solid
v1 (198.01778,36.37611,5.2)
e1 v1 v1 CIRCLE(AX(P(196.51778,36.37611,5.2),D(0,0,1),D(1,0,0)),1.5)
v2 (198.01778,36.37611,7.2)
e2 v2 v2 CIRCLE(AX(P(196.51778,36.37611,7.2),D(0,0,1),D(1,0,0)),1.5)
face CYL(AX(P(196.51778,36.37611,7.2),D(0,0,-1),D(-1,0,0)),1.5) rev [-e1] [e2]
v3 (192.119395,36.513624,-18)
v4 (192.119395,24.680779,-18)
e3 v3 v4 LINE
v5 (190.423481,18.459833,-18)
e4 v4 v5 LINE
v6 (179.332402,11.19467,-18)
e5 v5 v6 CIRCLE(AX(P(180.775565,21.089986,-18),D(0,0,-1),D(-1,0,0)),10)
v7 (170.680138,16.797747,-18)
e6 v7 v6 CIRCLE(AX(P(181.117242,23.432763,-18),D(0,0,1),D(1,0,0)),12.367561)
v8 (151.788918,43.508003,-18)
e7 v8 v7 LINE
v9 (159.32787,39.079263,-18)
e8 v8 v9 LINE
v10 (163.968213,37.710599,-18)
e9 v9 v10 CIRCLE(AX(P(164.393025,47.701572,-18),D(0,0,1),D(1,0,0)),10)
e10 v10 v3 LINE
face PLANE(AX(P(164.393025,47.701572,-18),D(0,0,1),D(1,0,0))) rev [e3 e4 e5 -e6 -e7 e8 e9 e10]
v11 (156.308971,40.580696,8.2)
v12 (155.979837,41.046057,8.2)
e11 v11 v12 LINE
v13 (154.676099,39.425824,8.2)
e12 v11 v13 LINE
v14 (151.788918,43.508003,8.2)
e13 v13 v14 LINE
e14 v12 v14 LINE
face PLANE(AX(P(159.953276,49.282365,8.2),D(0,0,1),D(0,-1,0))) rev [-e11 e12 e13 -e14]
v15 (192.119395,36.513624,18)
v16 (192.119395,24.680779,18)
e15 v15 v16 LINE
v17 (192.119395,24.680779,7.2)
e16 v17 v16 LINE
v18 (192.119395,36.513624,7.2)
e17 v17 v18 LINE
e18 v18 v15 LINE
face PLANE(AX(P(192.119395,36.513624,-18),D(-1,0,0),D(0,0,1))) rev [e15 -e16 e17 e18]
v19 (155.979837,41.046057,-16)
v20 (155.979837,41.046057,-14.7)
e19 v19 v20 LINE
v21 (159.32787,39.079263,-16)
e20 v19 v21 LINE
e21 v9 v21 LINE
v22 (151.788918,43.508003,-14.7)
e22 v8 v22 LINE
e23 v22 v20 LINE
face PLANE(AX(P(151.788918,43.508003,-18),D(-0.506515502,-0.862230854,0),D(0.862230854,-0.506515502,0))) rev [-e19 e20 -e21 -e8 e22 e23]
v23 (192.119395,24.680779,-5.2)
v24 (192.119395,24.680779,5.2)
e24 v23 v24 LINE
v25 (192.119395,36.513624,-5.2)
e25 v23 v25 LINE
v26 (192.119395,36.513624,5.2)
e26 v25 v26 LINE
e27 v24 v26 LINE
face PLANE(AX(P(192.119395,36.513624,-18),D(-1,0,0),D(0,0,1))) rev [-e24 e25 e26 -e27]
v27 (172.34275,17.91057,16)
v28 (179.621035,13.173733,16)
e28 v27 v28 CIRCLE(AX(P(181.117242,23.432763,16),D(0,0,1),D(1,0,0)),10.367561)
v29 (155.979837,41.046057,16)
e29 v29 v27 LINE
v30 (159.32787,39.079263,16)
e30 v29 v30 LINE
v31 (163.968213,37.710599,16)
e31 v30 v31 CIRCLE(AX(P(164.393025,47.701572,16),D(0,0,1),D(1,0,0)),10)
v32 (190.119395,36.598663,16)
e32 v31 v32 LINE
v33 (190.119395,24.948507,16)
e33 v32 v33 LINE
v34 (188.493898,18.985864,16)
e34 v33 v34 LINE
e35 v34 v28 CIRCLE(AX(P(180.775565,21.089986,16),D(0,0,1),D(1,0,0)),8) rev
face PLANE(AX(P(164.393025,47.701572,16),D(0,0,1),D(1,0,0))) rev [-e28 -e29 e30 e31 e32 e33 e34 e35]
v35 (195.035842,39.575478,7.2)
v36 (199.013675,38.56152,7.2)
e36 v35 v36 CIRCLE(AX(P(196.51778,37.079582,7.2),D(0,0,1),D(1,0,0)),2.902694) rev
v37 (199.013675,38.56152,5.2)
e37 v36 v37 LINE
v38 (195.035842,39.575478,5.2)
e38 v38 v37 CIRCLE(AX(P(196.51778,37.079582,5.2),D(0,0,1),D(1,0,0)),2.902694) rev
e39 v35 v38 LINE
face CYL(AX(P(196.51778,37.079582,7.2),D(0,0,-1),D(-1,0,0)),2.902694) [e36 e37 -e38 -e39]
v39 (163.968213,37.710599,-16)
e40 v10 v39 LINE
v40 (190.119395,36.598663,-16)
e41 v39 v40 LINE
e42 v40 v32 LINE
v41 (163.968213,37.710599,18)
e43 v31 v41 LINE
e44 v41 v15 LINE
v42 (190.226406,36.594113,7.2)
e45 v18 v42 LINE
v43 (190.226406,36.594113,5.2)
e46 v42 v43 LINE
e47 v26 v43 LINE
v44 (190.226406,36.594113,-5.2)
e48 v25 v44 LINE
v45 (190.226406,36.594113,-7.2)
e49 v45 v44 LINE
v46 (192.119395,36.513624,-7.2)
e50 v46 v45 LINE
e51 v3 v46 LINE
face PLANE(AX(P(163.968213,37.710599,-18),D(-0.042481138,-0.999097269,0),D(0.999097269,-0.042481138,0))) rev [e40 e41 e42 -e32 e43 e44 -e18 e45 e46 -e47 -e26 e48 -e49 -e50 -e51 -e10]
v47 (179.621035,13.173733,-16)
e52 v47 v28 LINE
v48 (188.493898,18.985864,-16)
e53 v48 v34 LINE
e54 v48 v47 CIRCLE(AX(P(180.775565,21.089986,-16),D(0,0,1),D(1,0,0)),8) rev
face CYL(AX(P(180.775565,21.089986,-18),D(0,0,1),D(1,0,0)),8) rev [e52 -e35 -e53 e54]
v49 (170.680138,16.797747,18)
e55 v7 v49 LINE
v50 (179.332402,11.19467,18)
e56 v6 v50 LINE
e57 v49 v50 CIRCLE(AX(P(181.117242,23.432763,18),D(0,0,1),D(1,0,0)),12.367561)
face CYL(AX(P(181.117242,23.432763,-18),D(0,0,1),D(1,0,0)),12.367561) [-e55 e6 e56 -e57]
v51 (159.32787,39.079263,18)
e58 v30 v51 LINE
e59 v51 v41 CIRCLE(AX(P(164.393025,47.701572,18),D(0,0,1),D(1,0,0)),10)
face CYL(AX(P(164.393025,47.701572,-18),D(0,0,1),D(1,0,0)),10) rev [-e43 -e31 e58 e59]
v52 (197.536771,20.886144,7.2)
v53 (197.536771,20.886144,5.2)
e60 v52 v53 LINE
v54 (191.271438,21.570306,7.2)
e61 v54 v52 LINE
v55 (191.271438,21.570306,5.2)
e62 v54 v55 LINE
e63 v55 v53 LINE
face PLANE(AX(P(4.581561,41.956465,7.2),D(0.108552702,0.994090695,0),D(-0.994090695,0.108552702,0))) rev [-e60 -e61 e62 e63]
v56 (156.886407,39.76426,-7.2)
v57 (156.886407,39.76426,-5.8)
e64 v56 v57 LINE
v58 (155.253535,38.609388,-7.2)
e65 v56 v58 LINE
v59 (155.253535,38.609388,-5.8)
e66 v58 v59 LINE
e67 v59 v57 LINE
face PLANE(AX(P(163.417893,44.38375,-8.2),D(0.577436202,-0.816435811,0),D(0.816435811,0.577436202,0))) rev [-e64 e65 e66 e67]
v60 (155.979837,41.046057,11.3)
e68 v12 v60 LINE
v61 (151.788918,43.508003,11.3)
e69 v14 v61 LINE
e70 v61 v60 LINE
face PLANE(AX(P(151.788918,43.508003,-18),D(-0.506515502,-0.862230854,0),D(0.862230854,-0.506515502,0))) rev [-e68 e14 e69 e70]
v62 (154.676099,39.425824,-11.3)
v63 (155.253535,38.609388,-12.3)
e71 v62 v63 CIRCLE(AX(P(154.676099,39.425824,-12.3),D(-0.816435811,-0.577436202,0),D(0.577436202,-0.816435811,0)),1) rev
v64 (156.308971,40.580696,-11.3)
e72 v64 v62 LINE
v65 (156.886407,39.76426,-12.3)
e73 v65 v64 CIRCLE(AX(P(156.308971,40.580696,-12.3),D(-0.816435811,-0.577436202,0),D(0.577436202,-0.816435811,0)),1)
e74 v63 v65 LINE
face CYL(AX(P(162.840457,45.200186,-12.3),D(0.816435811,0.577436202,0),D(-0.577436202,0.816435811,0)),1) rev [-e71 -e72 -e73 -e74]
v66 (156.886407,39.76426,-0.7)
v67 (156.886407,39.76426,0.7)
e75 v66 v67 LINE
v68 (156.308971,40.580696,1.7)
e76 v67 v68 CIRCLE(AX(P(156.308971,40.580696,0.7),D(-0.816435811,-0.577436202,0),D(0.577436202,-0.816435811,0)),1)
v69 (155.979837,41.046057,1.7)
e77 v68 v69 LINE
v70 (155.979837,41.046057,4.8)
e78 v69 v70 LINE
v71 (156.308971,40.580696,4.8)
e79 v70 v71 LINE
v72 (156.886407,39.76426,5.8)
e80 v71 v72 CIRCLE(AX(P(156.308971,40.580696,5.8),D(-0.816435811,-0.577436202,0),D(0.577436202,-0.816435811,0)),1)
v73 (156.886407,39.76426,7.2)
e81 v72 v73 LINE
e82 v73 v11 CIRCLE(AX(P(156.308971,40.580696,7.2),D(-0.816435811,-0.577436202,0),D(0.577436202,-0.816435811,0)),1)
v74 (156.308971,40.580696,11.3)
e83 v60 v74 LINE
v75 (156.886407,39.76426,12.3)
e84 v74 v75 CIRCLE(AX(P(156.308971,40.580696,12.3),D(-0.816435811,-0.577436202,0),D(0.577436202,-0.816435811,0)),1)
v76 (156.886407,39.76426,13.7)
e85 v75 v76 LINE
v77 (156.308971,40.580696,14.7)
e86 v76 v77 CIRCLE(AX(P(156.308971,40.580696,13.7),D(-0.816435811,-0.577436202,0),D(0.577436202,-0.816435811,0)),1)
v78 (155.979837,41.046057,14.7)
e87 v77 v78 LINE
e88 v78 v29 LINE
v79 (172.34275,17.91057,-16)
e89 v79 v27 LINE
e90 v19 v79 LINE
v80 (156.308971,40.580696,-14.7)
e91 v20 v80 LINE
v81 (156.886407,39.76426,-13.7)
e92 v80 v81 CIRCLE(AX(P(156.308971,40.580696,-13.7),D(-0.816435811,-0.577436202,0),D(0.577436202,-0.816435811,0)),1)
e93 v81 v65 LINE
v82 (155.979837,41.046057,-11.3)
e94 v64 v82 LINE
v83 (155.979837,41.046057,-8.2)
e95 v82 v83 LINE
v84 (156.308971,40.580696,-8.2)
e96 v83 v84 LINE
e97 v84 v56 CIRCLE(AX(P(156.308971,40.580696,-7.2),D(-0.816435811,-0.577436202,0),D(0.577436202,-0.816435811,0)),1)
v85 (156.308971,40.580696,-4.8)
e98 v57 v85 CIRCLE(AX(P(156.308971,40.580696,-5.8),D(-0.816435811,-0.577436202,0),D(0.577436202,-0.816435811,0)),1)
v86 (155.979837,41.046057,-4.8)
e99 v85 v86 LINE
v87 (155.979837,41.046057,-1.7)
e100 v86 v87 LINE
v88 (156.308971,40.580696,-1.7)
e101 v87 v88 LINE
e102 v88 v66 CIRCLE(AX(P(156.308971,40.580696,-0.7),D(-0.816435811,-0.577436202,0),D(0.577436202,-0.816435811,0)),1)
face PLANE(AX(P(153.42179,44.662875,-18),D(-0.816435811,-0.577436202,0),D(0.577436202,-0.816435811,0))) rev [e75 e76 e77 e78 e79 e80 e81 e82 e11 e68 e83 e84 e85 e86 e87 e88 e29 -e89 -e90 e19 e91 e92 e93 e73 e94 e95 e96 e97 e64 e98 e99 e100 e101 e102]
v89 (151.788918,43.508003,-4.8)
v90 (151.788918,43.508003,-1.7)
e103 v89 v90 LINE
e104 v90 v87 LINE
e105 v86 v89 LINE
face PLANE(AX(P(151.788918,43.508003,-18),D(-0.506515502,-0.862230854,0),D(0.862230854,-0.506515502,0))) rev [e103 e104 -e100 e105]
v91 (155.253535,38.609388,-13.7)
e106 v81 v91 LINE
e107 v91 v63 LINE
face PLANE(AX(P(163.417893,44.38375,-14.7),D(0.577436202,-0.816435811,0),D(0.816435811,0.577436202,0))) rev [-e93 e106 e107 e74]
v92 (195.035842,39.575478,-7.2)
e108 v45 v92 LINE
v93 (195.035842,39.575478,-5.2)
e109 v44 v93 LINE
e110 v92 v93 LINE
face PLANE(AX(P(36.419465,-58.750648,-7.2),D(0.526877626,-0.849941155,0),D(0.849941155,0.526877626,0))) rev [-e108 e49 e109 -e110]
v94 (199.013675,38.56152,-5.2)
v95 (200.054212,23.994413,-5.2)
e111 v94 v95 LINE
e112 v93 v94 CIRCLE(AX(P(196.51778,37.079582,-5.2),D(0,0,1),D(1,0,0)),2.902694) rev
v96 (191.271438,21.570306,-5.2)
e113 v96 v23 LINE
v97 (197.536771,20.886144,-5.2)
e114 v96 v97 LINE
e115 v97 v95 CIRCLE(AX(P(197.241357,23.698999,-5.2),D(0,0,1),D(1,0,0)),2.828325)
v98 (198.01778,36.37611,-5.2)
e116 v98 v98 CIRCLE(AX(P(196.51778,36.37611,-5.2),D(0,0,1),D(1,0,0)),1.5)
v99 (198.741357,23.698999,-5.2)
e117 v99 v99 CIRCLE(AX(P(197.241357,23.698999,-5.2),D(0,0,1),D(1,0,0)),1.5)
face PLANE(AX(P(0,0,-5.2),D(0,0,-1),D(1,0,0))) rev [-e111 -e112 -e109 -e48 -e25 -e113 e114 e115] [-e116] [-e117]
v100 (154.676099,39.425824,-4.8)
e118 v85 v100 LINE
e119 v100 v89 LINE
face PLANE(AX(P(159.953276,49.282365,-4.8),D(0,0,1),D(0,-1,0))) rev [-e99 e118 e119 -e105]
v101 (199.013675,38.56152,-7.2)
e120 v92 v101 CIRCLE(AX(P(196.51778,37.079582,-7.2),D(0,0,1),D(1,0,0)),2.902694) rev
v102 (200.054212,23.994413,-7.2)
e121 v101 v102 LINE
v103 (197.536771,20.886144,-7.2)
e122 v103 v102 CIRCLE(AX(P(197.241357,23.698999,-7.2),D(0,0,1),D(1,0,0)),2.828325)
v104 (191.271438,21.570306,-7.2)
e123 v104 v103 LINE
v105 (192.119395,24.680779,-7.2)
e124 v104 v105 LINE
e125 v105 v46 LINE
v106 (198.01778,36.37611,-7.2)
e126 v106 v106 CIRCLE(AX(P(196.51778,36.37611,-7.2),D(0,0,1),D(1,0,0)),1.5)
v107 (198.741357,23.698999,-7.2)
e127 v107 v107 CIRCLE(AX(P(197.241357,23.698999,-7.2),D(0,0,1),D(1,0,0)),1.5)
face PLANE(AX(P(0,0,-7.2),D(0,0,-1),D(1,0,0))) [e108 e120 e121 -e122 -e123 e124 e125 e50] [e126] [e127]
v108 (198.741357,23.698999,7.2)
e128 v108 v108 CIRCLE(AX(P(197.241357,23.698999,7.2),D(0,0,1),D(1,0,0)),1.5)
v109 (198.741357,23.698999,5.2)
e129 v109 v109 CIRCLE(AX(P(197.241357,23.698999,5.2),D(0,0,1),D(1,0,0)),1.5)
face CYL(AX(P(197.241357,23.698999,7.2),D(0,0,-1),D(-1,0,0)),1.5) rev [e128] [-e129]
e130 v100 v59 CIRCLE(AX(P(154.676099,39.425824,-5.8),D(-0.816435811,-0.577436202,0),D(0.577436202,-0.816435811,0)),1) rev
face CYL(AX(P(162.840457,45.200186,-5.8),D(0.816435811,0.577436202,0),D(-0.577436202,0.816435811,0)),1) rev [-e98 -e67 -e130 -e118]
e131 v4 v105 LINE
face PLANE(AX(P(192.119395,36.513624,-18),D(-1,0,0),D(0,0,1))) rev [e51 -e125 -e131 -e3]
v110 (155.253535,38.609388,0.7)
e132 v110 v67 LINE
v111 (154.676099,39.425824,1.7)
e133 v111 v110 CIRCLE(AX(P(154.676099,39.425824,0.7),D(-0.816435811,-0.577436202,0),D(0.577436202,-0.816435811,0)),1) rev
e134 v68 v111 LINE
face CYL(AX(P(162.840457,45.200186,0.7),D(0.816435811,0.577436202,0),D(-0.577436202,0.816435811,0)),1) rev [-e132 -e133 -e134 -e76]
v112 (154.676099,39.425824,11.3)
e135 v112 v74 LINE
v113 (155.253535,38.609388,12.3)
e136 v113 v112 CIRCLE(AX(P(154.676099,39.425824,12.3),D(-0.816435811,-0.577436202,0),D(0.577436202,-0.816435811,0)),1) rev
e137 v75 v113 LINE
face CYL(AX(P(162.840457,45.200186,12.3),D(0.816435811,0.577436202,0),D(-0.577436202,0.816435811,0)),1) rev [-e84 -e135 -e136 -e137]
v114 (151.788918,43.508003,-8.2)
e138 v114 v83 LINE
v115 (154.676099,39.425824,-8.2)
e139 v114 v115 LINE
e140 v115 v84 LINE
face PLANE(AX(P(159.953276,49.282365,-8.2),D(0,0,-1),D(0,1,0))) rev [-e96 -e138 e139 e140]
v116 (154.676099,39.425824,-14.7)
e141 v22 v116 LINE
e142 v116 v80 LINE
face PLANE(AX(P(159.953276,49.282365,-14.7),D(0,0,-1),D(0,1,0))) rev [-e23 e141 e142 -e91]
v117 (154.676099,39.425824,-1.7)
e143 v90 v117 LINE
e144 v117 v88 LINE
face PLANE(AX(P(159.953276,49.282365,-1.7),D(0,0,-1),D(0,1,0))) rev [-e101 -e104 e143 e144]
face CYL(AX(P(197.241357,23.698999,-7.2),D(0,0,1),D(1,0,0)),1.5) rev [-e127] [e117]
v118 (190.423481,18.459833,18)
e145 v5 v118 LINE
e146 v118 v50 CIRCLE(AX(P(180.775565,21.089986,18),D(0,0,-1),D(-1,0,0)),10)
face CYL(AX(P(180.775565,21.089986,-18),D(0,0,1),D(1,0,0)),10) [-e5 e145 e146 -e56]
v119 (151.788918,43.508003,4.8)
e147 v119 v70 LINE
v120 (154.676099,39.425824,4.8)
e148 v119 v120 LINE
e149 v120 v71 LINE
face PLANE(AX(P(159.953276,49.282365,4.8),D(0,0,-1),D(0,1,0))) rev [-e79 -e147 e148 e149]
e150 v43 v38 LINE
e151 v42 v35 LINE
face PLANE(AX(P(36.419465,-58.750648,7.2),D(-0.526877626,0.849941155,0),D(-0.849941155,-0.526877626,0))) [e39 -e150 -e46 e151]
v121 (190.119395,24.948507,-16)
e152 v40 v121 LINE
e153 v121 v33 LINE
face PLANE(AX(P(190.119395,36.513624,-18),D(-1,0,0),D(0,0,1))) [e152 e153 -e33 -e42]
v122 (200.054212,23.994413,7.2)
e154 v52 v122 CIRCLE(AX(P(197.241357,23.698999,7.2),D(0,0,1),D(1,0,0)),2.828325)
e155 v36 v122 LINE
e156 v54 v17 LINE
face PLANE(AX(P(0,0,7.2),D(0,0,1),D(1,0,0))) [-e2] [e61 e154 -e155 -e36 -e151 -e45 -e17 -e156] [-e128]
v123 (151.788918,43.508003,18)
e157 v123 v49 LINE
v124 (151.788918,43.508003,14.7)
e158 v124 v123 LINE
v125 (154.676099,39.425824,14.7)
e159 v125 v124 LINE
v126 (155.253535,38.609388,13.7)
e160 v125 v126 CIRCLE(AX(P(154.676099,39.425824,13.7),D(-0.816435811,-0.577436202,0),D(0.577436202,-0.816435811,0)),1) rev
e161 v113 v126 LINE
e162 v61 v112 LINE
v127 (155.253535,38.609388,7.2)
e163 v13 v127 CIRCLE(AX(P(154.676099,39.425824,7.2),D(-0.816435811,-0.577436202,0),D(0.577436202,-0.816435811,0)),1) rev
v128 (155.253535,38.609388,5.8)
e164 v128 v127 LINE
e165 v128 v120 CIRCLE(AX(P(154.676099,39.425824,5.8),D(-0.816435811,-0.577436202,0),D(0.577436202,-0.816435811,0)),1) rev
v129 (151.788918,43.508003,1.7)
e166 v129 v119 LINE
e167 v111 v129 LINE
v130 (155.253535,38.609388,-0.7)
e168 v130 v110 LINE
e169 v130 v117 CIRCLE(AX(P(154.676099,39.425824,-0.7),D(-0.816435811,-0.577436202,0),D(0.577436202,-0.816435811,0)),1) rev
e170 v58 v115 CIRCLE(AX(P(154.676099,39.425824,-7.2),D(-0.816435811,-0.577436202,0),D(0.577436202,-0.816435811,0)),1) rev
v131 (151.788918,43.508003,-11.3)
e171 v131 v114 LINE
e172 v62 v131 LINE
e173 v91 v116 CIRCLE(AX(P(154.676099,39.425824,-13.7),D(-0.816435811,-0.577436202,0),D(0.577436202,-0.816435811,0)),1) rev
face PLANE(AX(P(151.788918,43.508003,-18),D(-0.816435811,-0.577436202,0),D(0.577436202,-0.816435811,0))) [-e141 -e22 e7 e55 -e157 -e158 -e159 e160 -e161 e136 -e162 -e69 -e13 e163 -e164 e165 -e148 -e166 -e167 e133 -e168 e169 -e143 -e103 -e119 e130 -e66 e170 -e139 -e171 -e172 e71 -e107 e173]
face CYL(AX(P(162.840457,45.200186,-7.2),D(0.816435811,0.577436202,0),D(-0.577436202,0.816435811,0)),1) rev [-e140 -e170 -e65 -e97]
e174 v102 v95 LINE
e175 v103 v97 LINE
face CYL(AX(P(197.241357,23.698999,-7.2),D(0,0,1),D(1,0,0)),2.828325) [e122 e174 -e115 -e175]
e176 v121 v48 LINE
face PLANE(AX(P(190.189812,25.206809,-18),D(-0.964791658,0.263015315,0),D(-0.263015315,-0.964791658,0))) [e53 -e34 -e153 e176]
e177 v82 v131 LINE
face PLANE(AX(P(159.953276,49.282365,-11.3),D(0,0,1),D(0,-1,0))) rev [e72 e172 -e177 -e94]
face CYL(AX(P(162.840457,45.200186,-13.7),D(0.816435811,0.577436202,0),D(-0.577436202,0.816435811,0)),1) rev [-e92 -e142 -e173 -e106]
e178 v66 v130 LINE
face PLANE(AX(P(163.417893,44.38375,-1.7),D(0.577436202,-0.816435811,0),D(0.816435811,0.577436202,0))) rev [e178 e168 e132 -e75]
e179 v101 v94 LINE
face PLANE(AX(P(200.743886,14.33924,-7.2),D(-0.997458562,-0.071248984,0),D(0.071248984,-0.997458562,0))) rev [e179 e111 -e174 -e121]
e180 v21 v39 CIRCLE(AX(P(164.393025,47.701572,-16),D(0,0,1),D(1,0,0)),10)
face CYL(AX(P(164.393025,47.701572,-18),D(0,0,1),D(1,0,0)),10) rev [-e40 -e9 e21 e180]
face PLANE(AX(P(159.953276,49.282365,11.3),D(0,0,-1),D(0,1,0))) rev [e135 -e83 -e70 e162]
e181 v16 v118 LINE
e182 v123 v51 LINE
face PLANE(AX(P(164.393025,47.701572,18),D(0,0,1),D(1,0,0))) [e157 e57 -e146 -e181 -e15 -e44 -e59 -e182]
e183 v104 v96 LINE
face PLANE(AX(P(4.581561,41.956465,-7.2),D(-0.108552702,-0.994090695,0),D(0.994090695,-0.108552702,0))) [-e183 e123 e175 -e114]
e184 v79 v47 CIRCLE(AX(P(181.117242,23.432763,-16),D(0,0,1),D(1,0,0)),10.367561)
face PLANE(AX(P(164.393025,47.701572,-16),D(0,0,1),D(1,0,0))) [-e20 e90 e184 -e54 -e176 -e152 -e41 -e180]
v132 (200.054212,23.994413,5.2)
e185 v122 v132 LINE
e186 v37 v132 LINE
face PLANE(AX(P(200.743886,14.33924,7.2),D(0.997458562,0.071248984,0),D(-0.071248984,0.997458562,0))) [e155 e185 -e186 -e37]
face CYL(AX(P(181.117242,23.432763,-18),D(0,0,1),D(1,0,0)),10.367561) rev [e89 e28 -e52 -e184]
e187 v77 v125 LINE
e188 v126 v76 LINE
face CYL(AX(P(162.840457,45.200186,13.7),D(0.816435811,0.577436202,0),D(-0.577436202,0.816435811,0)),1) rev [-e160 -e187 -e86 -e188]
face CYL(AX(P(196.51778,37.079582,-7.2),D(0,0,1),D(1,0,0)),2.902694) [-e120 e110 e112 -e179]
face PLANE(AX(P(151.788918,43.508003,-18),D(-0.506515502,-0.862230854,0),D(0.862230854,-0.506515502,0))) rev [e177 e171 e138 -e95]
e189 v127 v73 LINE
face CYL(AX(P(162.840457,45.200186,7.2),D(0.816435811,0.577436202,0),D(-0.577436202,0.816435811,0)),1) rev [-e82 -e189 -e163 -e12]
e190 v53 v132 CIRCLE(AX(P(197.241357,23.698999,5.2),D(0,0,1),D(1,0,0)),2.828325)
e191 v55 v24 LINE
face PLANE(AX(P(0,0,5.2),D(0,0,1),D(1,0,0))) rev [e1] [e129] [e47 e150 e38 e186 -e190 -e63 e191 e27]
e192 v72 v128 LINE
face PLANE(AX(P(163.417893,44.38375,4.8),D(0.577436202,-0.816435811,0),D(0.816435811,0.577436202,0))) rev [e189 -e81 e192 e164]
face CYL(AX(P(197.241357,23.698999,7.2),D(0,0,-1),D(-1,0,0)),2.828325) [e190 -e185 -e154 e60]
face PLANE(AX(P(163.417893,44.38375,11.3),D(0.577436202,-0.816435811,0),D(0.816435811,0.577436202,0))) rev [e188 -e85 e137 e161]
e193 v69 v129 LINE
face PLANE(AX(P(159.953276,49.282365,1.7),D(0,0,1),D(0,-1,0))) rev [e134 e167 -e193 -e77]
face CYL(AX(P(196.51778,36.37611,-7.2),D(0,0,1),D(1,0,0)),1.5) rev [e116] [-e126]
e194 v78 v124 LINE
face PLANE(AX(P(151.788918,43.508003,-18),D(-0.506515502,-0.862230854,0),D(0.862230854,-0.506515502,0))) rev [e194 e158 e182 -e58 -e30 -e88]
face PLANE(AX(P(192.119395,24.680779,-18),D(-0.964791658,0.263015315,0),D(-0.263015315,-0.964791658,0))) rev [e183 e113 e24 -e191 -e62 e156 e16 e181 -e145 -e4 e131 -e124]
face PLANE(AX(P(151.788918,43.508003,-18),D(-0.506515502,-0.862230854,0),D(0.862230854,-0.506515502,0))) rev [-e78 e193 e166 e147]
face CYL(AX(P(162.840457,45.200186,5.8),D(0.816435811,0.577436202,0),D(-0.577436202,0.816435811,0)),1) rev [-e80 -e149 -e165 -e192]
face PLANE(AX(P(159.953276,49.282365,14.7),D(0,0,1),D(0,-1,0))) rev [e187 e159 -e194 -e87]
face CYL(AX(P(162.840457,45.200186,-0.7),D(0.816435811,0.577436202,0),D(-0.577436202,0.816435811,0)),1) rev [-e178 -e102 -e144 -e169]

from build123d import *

# Parameters (mm, degrees)
EXTRUDE_1_DEPTH            = 18
EXTRUDE_1_DEPTH_BACK       = 18
SHELL_START                = -16
SHELL_1_DEPTH              = 32
EXTRUDE_START              = 5.2
SKETCH_3_R                 = 1.5
EXTRUDE_4_DEPTH            = 2
SKETCH_4_W                 = 3.4
SKETCH_4_H                 = 6
CUT_EXTRUDE_1_DEPTH        = 10
PATTERN_LINEAR_1_COUNT     = 3
PATTERN_LINEAR_1_PITCH     = 6.5
PATTERN_LINEAR_1_COL_COUNT = 3
PATTERN_LINEAR_1_COL_PITCH = 6.5
FILLET_1_R                 = 1


# Read off the part's stored shape, not the designer's step: 抽壳1
with BuildPart() as part:
    # 草图1 → 凸台-拉伸1 (new, two sides: drawn at the far end of the back side and taken through both)
    with BuildSketch(Plane.XY.offset(-EXTRUDE_1_DEPTH_BACK)):
        with BuildLine():
            Line((151.788918014, 43.508002681), (159.327869649, 39.07926315))
            ThreePointArc((159.327869649, 39.07926315), (161.564024285, 38.110077711), (163.968213283, 37.710599005))
            Line((163.968213283, 37.710599005), (192.119395463, 36.513624191))
            Line((192.119395463, 36.513624191), (192.119395463, 24.680778737))
            Line((192.119395463, 24.680778737), (190.423481116, 18.459832962))
            ThreePointArc((190.423481116, 18.459832962), (186.255085289, 12.72488885), (179.332402452, 11.194669891))
            ThreePointArc((179.332402452, 11.194669891), (174.394698317, 13.051819811), (170.680138106, 16.797746984))
            Line((170.680138106, 16.797746984), (151.788918014, 43.508002681))
        make_face()
    extrude(amount=EXTRUDE_1_DEPTH + EXTRUDE_1_DEPTH_BACK)

    # 抽壳1 outline → 抽壳1 (cut)
    with BuildSketch(Plane.XY.offset(SHELL_START)):
        with BuildLine():
            Line((190.119395463, 24.94850719), (190.119395463, 36.598663235))
            Line((190.119395463, 36.598663235), (163.968213283, 37.710599005))
            ThreePointArc((163.968213283, 37.710599005), (161.564024285, 38.110077711), (159.327869649, 39.07926315))
            Line((159.327869649, 39.07926315), (155.979837332, 41.046056915))
            Line((155.979837332, 41.046056915), (172.342749657, 17.910570164))
            ThreePointArc((172.342749657, 17.910570164), (175.462047648, 14.743395572), (179.621034868, 13.173733136))
            ThreePointArc((179.621034868, 13.173733136), (185.159181138, 14.397908304), (188.493897799, 18.985863593))
            Line((188.493897799, 18.985863593), (190.119395463, 24.94850719))
        make_face()
    extrude(amount=SHELL_1_DEPTH, mode=Mode.SUBTRACT)

    # 草图3 → 凸台-拉伸4 (add)
    with BuildSketch(Plane.XY.offset(EXTRUDE_START)):
        with BuildLine():
            Line((195.035842319, 39.575477762), (190.226405911, 36.594113202))
            Line((190.226405911, 36.594113202), (192.119395463, 36.513624191))
            Line((192.119395463, 36.513624191), (192.119395463, 24.680778737))
            Line((192.119395463, 24.680778737), (191.271438289, 21.570305849))
            Line((191.271438289, 21.570305849), (197.536771011, 20.886144131))
            ThreePointArc((197.536771011, 20.886144131), (199.439234753, 21.918899338), (200.054211557, 23.99441256))
            Line((200.054211557, 23.99441256), (199.013675467, 38.561520293))
            ThreePointArc((199.013675467, 38.561520293), (197.234756361, 39.892335247), (195.035842319, 39.575477762))
        make_face()
        with Locations((197.241357069, 23.698998619)):
            Circle(SKETCH_3_R, mode=Mode.SUBTRACT)
        with Locations((196.517780159, 36.376109938)):
            Circle(SKETCH_3_R, mode=Mode.SUBTRACT)
    extrude_4 = extrude(amount=EXTRUDE_4_DEPTH)

    # 镜向1: 凸台-拉伸4 across plane
    add(extrude_4.mirror(Plane.XY))

    # 草图4 → 切除-拉伸1 (cut)
    with BuildSketch(Plane(origin=(121.688944553, 86.066290803, 0), x_dir=(0, 0, 1), z_dir=(-0.8164358107895011, -0.577436201549998, 0))):
        with Locations((0, -55.12692481)):
            Rectangle(SKETCH_4_W, SKETCH_4_H)
    cut_extrude_1 = extrude(amount=-CUT_EXTRUDE_1_DEPTH, mode=Mode.SUBTRACT)

    # 阵列(线性)1: 切除-拉伸1 ×3
    with Locations(*[(0, 0, -i * PATTERN_LINEAR_1_PITCH) for i in range(1, PATTERN_LINEAR_1_COUNT)]):
        add(cut_extrude_1, mode=Mode.SUBTRACT)

    # 阵列(线性)1 col: 切除-拉伸1 ×3
    with Locations(*[(0, 0, i * PATTERN_LINEAR_1_COL_PITCH) for i in range(1, PATTERN_LINEAR_1_COL_COUNT)]):
        add(cut_extrude_1, mode=Mode.SUBTRACT)

    # 圆角1
    fillet_1_edges = [part.edges().sort_by_distance(p)[0] for p in [
        (156.069971034, 39.186824018, -1.7),
        (156.069971034, 39.186824018, 1.7),
        (156.069971034, 39.186824018, 4.8),
        (156.069971034, 39.186824018, 8.2),
        (156.069971034, 39.186824018, 11.3),
        (156.069971034, 39.186824018, 14.7),
        (156.069971034, 39.186824018, -8.2),
        (156.069971034, 39.186824018, -4.8),
        (156.069971034, 39.186824018, -14.7),
        (156.069971034, 39.186824018, -11.3),
    ]]
    fillet(fillet_1_edges, radius=FILLET_1_R)


solid = part.part
